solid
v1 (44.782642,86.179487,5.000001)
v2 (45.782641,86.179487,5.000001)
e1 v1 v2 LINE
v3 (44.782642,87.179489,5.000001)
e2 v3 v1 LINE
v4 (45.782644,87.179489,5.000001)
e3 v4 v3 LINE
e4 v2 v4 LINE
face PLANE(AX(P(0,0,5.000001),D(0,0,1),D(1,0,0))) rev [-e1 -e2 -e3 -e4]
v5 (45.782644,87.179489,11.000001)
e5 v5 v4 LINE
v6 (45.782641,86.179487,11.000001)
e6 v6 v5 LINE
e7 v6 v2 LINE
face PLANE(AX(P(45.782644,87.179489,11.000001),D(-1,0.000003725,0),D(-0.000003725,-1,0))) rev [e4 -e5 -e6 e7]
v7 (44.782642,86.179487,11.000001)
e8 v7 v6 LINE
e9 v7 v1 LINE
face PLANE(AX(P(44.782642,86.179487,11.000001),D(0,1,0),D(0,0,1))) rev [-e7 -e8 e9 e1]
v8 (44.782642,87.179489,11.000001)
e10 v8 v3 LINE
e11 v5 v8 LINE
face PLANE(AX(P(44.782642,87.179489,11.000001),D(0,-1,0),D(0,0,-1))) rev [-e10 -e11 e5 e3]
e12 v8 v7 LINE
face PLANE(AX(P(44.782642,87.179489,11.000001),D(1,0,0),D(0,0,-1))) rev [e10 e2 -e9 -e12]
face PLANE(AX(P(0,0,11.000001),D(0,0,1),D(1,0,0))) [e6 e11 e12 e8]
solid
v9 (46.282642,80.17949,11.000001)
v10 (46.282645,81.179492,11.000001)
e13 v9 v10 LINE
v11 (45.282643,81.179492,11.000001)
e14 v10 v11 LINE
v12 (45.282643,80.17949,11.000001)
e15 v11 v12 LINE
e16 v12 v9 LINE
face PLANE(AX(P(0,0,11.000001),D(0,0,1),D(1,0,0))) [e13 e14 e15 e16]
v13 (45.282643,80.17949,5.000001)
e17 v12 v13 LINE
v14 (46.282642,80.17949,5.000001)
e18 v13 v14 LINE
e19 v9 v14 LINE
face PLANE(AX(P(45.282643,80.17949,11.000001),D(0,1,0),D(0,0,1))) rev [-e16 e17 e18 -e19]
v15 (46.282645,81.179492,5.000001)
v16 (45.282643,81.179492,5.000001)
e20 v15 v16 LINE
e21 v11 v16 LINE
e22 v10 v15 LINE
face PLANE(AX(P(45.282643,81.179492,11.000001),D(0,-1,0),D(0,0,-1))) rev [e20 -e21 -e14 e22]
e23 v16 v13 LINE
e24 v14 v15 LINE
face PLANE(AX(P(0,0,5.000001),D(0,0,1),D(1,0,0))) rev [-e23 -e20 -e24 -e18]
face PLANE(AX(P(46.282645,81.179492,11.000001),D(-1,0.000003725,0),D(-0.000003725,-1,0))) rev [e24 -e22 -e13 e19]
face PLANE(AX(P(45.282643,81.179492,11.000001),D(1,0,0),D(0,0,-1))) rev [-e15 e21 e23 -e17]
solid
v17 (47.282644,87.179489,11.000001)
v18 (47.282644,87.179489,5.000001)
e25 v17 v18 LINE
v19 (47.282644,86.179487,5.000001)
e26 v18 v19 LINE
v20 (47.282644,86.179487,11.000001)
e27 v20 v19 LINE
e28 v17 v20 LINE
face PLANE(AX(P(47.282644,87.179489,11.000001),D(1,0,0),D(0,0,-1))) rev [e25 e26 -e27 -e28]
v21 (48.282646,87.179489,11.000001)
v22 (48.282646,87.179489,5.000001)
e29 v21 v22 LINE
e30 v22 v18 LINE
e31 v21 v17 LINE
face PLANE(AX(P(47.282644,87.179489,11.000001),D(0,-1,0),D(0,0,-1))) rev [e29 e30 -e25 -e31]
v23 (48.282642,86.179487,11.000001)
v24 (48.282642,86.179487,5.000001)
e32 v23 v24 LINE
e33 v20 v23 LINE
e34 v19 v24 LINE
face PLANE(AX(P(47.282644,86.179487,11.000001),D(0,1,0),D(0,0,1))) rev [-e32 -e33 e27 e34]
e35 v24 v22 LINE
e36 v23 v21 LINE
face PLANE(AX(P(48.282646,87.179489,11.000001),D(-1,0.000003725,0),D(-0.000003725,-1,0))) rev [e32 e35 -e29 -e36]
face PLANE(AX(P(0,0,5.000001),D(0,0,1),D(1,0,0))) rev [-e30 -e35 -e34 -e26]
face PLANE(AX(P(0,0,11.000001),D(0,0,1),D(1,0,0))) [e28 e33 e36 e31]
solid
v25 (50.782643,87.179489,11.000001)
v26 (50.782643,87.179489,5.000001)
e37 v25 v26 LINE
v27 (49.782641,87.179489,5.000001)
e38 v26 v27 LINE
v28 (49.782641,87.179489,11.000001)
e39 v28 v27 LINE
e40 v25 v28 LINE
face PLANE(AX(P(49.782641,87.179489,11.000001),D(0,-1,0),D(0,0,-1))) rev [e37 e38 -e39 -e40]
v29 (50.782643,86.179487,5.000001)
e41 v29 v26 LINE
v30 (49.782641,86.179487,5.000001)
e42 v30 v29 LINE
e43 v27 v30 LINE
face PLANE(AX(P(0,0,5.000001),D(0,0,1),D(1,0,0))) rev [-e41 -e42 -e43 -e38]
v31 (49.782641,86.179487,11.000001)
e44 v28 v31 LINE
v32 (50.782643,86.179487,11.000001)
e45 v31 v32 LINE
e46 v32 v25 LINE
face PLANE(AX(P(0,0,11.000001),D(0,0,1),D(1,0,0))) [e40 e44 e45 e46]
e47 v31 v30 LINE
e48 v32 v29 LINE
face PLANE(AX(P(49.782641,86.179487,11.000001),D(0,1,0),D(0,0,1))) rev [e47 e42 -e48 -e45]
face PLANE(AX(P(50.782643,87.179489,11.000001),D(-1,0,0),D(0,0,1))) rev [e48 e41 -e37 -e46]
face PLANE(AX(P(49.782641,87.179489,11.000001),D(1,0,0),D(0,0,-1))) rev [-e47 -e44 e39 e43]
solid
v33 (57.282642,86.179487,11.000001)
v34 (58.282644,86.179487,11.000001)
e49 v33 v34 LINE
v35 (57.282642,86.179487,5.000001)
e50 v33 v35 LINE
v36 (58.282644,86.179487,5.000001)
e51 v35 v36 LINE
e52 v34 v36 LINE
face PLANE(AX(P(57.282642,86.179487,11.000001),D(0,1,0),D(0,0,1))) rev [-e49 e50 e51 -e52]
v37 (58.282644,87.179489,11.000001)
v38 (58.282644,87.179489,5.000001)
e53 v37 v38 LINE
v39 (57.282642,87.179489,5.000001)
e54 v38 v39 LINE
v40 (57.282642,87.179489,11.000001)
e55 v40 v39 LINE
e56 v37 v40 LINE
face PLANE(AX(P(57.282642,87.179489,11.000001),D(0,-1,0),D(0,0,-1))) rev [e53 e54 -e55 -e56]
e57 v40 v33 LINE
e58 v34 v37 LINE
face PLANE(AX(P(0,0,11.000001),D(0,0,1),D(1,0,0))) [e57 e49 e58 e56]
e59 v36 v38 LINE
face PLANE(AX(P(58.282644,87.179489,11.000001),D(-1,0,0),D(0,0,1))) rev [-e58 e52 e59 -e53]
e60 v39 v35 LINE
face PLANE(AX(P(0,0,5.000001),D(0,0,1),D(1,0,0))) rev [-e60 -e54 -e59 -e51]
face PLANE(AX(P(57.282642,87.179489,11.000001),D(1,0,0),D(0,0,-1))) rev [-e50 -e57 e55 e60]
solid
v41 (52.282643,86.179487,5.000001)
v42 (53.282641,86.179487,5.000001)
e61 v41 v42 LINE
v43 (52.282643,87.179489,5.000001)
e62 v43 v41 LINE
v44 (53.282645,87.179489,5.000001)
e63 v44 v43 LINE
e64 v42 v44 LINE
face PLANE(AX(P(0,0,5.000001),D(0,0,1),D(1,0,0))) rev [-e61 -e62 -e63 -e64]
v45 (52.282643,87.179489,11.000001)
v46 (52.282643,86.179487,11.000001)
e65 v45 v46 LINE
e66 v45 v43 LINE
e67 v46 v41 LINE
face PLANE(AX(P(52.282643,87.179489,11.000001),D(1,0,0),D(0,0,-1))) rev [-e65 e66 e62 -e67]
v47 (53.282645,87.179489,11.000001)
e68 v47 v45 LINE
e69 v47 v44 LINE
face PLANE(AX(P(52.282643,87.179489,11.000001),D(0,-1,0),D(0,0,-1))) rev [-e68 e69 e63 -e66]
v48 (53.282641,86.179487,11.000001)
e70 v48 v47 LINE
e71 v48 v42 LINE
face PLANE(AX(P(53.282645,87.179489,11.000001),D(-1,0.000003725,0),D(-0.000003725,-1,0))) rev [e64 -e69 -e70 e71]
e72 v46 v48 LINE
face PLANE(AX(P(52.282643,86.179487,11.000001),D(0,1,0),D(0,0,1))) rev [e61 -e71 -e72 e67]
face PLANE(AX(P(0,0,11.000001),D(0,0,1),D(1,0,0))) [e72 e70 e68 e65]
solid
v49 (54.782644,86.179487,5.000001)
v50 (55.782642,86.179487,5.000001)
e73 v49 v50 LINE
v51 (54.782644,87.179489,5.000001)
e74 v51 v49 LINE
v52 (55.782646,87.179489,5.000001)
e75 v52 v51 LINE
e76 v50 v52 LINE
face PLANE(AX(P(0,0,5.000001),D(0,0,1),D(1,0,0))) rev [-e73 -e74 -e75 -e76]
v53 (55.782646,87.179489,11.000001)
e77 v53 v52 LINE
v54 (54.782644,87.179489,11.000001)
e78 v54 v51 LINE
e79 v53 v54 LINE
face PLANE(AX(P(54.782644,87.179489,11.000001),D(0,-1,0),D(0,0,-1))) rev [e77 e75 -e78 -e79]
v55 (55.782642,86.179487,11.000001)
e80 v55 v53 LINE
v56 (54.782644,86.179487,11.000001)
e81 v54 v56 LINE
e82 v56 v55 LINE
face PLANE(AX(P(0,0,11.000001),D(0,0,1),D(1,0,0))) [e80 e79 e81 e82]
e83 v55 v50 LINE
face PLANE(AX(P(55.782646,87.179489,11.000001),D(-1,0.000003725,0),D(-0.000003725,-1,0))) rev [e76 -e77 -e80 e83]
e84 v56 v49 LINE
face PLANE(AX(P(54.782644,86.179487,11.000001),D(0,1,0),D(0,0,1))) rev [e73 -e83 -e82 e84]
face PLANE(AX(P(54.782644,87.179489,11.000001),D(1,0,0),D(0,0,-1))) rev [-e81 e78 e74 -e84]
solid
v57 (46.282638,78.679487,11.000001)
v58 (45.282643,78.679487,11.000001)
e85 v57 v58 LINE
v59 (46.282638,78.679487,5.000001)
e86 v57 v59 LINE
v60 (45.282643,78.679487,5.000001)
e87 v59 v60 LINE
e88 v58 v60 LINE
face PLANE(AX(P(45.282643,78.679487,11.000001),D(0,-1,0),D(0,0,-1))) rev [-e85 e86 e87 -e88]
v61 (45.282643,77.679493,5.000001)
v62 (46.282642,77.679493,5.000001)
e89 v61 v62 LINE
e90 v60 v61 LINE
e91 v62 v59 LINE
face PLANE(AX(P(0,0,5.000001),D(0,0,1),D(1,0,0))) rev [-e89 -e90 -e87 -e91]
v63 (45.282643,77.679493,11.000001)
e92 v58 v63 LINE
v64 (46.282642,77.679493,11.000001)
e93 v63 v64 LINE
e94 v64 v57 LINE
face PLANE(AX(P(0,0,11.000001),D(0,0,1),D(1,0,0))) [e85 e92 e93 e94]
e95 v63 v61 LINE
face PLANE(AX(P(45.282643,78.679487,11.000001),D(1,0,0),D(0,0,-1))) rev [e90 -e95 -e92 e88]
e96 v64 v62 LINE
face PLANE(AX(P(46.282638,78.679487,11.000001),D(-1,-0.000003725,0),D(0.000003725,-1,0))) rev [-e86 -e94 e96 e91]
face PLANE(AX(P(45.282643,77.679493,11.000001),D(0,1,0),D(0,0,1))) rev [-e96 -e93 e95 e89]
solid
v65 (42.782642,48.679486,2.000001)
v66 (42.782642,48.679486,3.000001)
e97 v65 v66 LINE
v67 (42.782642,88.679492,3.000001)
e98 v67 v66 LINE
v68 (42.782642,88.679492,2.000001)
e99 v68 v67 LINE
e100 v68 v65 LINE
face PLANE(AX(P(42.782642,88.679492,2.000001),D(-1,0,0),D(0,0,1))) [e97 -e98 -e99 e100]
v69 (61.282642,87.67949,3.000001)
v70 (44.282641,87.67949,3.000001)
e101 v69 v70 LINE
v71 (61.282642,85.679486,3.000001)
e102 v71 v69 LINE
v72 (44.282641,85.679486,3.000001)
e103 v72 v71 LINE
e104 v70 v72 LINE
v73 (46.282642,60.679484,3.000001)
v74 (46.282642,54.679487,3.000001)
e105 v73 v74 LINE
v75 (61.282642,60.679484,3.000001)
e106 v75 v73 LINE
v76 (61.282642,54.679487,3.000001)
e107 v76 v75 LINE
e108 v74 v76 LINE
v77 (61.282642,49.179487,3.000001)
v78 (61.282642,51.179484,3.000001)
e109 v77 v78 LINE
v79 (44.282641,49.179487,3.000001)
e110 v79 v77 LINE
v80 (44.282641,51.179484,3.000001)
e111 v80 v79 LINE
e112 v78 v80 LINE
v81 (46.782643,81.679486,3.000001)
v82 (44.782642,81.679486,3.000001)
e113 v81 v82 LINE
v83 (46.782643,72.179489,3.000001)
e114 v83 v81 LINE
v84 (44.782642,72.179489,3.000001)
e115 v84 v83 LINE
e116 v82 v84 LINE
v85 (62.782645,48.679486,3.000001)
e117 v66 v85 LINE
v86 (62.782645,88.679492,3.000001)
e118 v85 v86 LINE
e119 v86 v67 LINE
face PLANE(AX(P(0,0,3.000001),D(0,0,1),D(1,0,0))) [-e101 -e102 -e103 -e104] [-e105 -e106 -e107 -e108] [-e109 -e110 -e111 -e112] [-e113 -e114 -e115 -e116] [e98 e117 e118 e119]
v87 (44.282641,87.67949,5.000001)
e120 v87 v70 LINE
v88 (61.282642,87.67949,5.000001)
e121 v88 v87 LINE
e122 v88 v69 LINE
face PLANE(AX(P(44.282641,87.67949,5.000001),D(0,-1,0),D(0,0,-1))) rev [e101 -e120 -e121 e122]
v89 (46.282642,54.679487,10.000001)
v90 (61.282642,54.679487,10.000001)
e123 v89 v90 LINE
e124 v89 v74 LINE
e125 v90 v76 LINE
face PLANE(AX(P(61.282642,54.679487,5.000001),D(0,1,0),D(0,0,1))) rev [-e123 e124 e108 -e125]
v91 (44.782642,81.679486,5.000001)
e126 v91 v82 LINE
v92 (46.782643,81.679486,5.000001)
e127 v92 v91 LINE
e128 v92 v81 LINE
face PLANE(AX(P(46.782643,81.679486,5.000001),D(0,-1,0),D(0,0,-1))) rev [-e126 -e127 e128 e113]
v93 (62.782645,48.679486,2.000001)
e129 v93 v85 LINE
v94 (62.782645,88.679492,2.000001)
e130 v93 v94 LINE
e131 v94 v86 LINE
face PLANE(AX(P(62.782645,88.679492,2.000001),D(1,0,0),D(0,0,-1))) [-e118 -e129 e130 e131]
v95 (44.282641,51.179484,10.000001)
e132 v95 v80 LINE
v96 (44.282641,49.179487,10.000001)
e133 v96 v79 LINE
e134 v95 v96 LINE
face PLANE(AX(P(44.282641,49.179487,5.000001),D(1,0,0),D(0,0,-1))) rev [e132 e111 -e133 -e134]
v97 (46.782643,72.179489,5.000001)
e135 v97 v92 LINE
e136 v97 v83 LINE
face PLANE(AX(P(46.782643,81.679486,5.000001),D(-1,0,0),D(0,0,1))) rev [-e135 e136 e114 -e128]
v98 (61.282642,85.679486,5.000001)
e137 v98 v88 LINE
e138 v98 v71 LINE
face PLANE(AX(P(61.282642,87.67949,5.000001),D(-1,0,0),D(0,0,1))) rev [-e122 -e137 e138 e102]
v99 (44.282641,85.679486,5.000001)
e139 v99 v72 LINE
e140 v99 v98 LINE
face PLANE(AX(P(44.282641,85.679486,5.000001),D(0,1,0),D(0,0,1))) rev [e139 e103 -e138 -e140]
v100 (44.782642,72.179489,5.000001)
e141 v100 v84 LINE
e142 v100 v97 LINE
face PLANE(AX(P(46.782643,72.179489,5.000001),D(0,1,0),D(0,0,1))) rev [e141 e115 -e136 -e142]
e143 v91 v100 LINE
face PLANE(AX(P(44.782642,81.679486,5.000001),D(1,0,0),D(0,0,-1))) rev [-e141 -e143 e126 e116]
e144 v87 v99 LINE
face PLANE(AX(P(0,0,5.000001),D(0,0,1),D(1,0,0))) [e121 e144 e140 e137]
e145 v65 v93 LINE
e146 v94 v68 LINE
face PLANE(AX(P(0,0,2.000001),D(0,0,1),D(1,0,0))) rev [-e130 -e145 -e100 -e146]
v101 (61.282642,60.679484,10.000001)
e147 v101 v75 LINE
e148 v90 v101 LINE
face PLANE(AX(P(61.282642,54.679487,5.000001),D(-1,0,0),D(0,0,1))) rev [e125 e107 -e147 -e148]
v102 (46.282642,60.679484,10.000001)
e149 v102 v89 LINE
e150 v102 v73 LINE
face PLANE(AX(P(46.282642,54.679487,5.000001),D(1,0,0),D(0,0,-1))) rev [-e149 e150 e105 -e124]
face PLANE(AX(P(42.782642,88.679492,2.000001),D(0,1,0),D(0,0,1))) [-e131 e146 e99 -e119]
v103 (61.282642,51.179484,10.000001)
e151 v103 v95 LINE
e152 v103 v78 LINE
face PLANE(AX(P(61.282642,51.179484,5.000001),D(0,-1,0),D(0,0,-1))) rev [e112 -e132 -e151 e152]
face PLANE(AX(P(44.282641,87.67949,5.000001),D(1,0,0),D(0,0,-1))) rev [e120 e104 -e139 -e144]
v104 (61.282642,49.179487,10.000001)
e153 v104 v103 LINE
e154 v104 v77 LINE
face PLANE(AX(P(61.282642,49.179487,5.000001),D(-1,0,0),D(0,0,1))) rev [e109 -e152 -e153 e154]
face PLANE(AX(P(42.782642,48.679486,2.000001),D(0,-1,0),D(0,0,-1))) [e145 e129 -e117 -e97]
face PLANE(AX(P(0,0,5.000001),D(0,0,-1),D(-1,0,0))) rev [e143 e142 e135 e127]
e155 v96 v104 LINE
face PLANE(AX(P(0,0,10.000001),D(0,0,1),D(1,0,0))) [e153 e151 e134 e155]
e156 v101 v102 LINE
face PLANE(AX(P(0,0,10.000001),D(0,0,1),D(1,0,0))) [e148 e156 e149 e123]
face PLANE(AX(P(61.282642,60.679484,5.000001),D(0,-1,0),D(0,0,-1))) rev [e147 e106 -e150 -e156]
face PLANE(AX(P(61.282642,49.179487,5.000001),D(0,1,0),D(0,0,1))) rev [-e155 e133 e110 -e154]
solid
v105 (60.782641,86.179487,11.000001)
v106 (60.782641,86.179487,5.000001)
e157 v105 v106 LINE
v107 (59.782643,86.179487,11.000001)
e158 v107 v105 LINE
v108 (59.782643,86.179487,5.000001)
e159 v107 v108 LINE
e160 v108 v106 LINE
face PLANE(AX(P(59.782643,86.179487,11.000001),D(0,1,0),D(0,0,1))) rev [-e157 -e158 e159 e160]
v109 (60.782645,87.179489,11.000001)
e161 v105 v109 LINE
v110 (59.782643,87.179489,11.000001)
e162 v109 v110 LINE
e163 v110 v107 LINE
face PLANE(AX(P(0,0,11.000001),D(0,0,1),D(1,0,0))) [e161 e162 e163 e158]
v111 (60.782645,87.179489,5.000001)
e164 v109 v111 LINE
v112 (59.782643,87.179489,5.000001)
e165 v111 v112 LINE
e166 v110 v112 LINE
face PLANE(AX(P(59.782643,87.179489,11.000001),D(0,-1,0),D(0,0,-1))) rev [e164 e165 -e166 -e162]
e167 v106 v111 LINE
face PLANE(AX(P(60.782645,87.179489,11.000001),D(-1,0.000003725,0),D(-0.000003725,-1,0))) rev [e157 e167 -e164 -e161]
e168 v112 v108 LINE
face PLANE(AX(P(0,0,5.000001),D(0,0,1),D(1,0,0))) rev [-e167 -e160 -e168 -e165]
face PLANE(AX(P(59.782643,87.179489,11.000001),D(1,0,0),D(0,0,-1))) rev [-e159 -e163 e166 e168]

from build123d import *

# Parameters (mm, degrees)
SKETCH2_W              = 17.000000924
SKETCH2_H              = 1.999996603
BOSS_EXTRUDE9_DEPTH    = 2
SKETCH2_H_2            = 2.000004053
BOSS_EXTRUDE9_2_DEPTH  = 2
SKETCH2_W_2            = 2.000000328
SKETCH2_H_3            = 9.4999969
BOSS_EXTRUDE9_3_DEPTH  = 2
SKETCH2_W_3            = 15.000000596
SKETCH2_H_4            = 5.999997258
BOSS_EXTRUDE9_4_DEPTH  = 2
BOSS_EXTRUDE11_DEPTH   = 6
BOSS_EXTRUDE11_2_DEPTH = 6
SKETCH3_W              = 1.000002027
SKETCH3_H              = 1.000002027
BOSS_EXTRUDE11_3_DEPTH = 6
BOSS_EXTRUDE11_4_DEPTH = 6
BOSS_EXTRUDE11_5_DEPTH = 6
BOSS_EXTRUDE11_6_DEPTH = 6
BOSS_EXTRUDE11_7_DEPTH = 6
BOSS_EXTRUDE11_8_DEPTH = 6
BOSS_EXTRUDE11_9_DEPTH = 6
SKETCH1_W              = 20.000003279
SKETCH1_H              = 40.000006557
BOSS_EXTRUDE12_DEPTH   = 1
MOVE_FACE1_BY          = 5
MOVE_FACE1_2_BY        = 5


# Read off the part's stored shape, not the designer's step: Imported1
with BuildPart() as part:
    # Sketch2 → Boss-Extrude9 (new body)
    with BuildSketch(Plane.XY.offset(3.000000957)):
        with Locations((52.782641724, 50.179485232)):
            Rectangle(SKETCH2_W, SKETCH2_H)
    extrude(amount=BOSS_EXTRUDE9_DEPTH)



with BuildPart() as body_2:
    # Sketch2 → Boss-Extrude9 2 (new body)
    with BuildSketch(Plane.XY.offset(3.000000957)):
        with Locations((52.782641724, 86.679488421)):
            Rectangle(SKETCH2_W, SKETCH2_H_2)
    extrude(amount=BOSS_EXTRUDE9_2_DEPTH)


with BuildPart() as body_3:
    # Sketch2 → Boss-Extrude9 3 (new body)
    with BuildSketch(Plane.XY.offset(3.000000957)):
        with Locations((45.782642439, 76.929487288)):
            Rectangle(SKETCH2_W_2, SKETCH2_H_3)
    extrude(amount=BOSS_EXTRUDE9_3_DEPTH)


with BuildPart() as body_4:
    # Sketch2 → Boss-Extrude9 4 (new body)
    with BuildSketch(Plane.XY.offset(3.000000957)):
        with Locations((53.782641888, 57.67948553)):
            Rectangle(SKETCH2_W_3, SKETCH2_H_4)
    extrude(amount=BOSS_EXTRUDE9_4_DEPTH)


with BuildPart() as body_5:
    # Sketch3 → Boss-Extrude11 (new body)
    with BuildSketch(Plane.XY.offset(5.000000957)):
        Polygon((44.782642275, 87.179489434), (45.782644302, 87.179489434), (45.782640576, 86.179487407), (44.782642275, 86.179487407), align=None)
    extrude(amount=BOSS_EXTRUDE11_DEPTH)


with BuildPart() as body_6:
    # Sketch3 → Boss-Extrude11 2 (new body)
    with BuildSketch(Plane.XY.offset(5.000000957)):
        Polygon((47.282643616, 87.179489434), (48.282645643, 87.179489434), (48.282641917, 86.179487407), (47.282643616, 86.179487407), align=None)
    extrude(amount=BOSS_EXTRUDE11_2_DEPTH)


with BuildPart() as body_7:
    # Sketch3 → Boss-Extrude11 3 (new body)
    with BuildSketch(Plane.XY.offset(5.000000957)):
        with Locations((50.282642245, 86.679488421)):
            Rectangle(SKETCH3_W, SKETCH3_H)
    extrude(amount=BOSS_EXTRUDE11_3_DEPTH)


with BuildPart() as body_8:
    # Sketch3 → Boss-Extrude11 4 (new body)
    with BuildSketch(Plane.XY.offset(5.000000957)):
        Polygon((52.282642573, 87.179489434), (53.2826446, 87.179489434), (53.282640874, 86.179487407), (52.282642573, 86.179487407), align=None)
    extrude(amount=BOSS_EXTRUDE11_4_DEPTH)


with BuildPart() as body_9:
    # Sketch3 → Boss-Extrude11 5 (new body)
    with BuildSketch(Plane.XY.offset(5.000000957)):
        Polygon((54.782643914, 87.179489434), (55.782645941, 87.179489434), (55.782642215, 86.179487407), (54.782643914, 86.179487407), align=None)
    extrude(amount=BOSS_EXTRUDE11_5_DEPTH)


with BuildPart() as body_10:
    # Sketch3 → Boss-Extrude11 6 (new body)
    with BuildSketch(Plane.XY.offset(5.000000957)):
        with Locations((57.782642544, 86.679488421)):
            Rectangle(SKETCH3_W, SKETCH3_H)
    extrude(amount=BOSS_EXTRUDE11_6_DEPTH)


with BuildPart() as body_11:
    # Sketch3 → Boss-Extrude11 7 (new body)
    with BuildSketch(Plane.XY.offset(5.000000957)):
        Polygon((59.782642871, 87.179489434), (60.782644898, 87.179489434), (60.782641172, 86.179487407), (59.782642871, 86.179487407), align=None)
    extrude(amount=BOSS_EXTRUDE11_7_DEPTH)


with BuildPart() as body_12:
    # Sketch3 → Boss-Extrude11 8 (new body)
    with BuildSketch(Plane.XY.offset(5.000000957)):
        Polygon((45.282643288, 81.179492176), (46.282645315, 81.179492176), (46.28264159, 80.179490149), (45.282643288, 80.179490149), align=None)
    extrude(amount=BOSS_EXTRUDE11_8_DEPTH)


with BuildPart() as body_13:
    # Sketch3 → Boss-Extrude11 9 (new body)
    with BuildSketch(Plane.XY.offset(5.000000957)):
        Polygon((45.282643288, 78.679487109), (46.282637864, 78.679487109), (46.28264159, 77.679492533), (45.282643288, 77.679492533), align=None)
    extrude(amount=BOSS_EXTRUDE11_9_DEPTH)


with BuildPart() as part_1:
    add(part.part)

    add(body_2.part)  # Boss-Extrude12 merges body 2

    add(body_3.part)  # Boss-Extrude12 merges body 3

    add(body_4.part)  # Boss-Extrude12 merges body 4
    # Sketch1 → Boss-Extrude12 (add)
    with BuildSketch(Plane.XY.offset(3.000000957)):
        with Locations((52.782643587, 68.679489195)):
            Rectangle(SKETCH1_W, SKETCH1_H)
    extrude(amount=-BOSS_EXTRUDE12_DEPTH)

    # Move Face1: a face moved outward by 5.0
    extrude(part_1.faces().sort_by_distance((52.782641724, 50.179485232, 5.000000957))[0], amount=MOVE_FACE1_BY, dir=(0, 0, 1))

    # Move Face1 2: a face moved outward by 5.0
    extrude(part_1.faces().sort_by_distance((53.782641888, 57.67948553, 5.000000957))[0], amount=MOVE_FACE1_2_BY, dir=(0, 0, 1))


solid = Compound([body_5.part, body_6.part, body_7.part, body_8.part, body_9.part, body_10.part, body_11.part, body_12.part, body_13.part, part_1.part])
